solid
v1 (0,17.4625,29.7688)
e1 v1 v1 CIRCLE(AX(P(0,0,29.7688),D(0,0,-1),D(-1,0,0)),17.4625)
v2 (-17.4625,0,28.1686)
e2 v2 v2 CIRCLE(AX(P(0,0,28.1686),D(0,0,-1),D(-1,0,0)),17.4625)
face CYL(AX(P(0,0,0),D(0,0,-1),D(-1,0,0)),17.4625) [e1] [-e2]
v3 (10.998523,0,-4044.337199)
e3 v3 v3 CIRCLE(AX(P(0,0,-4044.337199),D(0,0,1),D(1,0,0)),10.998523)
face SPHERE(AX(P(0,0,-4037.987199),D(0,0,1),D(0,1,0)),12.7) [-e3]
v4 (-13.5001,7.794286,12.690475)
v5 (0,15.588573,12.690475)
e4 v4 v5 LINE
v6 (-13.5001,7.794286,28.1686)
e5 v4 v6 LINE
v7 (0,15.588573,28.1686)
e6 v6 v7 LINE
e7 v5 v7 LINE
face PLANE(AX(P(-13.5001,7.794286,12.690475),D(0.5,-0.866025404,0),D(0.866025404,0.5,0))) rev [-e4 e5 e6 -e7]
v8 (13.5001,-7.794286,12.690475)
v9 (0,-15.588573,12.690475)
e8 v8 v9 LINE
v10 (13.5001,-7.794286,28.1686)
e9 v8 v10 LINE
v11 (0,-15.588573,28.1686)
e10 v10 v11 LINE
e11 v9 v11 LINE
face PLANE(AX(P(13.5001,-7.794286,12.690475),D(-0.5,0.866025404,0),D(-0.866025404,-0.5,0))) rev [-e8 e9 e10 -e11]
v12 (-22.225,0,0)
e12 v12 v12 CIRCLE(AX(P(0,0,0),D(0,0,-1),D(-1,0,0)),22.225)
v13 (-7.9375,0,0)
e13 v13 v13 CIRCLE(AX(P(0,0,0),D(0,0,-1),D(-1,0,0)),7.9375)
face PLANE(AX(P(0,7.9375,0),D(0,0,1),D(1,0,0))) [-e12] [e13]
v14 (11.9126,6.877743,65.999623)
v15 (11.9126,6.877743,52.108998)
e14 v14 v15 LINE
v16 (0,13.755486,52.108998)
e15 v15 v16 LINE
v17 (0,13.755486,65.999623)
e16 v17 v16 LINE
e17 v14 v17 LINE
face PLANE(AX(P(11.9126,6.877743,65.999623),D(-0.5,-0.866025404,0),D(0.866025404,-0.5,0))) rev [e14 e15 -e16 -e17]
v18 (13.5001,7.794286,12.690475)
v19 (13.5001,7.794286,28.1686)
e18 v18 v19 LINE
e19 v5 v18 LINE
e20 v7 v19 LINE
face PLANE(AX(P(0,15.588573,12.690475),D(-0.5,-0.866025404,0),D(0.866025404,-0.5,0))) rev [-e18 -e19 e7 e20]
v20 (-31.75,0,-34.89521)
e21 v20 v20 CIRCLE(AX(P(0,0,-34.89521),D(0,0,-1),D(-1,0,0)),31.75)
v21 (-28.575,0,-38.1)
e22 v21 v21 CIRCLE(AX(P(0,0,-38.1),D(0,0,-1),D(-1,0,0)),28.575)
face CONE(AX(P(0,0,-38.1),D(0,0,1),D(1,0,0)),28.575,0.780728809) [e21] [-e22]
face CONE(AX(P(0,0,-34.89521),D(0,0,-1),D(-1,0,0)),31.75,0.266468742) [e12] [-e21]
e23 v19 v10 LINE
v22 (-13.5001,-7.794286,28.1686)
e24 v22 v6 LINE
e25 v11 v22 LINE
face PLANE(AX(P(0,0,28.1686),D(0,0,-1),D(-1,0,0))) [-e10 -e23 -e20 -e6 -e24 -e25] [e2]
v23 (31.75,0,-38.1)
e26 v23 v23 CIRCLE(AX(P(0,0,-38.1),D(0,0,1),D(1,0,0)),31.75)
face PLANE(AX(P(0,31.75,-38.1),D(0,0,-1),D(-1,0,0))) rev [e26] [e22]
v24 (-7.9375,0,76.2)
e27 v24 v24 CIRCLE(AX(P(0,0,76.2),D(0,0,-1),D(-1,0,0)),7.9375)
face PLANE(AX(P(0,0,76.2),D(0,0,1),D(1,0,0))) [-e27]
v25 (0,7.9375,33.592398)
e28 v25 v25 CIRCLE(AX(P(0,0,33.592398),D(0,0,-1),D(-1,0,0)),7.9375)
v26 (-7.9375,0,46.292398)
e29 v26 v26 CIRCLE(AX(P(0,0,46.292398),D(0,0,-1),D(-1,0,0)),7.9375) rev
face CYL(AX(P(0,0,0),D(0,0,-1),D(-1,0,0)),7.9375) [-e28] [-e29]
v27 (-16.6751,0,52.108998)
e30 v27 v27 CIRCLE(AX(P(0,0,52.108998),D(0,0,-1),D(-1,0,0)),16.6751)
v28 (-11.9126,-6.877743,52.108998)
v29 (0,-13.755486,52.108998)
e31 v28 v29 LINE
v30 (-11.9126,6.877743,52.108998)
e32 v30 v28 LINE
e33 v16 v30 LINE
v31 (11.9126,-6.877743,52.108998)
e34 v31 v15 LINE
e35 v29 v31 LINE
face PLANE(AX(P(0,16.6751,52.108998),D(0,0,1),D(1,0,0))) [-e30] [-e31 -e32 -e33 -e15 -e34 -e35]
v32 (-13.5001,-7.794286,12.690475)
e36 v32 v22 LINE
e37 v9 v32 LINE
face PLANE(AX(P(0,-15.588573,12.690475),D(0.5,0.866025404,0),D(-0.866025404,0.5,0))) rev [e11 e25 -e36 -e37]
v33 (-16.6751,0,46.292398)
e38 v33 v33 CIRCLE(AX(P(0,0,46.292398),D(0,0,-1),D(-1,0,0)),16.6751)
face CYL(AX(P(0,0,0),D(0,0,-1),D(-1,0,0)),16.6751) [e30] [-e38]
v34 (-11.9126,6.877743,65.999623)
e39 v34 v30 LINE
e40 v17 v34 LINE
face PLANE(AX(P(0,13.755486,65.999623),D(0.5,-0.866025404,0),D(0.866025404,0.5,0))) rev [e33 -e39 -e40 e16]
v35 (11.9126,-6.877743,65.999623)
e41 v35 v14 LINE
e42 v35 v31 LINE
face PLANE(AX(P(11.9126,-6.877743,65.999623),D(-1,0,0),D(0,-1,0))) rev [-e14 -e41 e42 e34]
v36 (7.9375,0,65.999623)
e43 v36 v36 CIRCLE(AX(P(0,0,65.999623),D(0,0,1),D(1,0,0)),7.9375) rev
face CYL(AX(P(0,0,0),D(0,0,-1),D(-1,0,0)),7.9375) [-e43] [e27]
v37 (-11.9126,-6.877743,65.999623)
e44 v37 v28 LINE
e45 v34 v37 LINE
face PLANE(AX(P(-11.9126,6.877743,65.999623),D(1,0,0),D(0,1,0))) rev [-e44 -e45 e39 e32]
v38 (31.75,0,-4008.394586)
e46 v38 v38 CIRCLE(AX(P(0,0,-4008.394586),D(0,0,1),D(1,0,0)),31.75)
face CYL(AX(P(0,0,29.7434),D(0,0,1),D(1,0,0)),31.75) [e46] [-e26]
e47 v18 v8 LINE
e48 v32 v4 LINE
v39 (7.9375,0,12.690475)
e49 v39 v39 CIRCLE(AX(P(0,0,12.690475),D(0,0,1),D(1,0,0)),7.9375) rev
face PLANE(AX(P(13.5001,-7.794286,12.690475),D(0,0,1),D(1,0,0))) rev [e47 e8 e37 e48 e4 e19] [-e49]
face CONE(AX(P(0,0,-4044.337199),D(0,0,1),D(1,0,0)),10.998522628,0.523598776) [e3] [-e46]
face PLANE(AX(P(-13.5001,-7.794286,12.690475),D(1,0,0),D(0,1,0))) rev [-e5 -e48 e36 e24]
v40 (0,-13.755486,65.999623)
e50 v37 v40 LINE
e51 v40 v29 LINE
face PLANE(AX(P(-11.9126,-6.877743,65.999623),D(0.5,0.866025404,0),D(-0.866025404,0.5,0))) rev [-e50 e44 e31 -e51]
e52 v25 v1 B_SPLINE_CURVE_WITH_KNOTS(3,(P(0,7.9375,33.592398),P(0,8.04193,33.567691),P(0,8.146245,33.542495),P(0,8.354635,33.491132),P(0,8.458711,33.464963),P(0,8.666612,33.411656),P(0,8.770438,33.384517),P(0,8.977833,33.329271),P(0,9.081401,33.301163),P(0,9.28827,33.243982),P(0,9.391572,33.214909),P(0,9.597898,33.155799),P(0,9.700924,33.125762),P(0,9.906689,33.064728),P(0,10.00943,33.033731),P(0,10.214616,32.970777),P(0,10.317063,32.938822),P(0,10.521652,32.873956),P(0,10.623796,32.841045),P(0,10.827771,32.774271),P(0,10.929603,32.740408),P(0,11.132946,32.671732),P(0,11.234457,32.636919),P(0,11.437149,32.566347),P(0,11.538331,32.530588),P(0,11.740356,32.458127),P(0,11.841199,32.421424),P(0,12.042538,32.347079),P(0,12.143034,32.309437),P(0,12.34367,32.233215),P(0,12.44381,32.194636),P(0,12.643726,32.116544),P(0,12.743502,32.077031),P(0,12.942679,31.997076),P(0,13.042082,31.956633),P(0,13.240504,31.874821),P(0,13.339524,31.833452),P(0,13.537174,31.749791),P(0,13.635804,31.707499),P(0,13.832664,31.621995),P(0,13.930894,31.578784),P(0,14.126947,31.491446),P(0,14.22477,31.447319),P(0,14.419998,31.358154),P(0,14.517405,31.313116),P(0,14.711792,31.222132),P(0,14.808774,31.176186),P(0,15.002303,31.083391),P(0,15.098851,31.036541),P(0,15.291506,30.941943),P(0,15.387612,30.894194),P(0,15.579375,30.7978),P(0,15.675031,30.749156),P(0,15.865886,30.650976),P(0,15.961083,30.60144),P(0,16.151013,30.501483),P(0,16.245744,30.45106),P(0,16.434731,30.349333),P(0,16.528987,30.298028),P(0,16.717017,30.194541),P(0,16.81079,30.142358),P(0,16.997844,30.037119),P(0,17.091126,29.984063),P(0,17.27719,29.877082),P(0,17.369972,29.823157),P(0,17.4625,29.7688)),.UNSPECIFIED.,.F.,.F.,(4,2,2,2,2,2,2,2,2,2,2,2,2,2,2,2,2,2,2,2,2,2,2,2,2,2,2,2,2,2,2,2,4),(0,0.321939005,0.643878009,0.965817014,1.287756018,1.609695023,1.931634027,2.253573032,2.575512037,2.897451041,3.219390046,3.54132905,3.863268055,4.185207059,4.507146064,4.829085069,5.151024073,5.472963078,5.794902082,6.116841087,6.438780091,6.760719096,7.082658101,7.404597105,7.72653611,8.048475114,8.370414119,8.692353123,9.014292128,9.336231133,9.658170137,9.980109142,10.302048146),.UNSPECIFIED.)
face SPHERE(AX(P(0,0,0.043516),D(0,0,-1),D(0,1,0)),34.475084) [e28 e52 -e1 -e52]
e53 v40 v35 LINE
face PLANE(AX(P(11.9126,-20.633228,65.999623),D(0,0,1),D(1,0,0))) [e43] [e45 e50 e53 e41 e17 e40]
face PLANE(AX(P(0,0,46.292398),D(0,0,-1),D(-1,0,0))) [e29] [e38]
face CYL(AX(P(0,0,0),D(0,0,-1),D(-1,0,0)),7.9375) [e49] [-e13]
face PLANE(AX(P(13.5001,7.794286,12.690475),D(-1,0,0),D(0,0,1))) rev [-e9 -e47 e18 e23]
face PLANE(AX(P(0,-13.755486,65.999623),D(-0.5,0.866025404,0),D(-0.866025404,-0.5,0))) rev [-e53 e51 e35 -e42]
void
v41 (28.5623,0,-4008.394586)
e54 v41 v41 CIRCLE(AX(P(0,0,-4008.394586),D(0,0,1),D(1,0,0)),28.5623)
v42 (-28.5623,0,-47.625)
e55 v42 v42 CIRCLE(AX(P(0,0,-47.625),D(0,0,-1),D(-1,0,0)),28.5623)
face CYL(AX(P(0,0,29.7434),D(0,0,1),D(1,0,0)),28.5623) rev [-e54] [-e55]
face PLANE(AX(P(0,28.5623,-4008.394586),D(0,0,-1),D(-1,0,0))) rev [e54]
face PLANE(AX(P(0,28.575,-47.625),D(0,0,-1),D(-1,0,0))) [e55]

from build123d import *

# Parameters (mm, degrees)
BOSS_REVOLVE3_START         = 12.690475
BOSS_REVOLVE3_OUTLINE_R     = 7.9375
BOSS_REVOLVE3_DEPTH         = 15.478125
BOSS_REVOLVE3_START_2       = 46.292398399
BOSS_REVOLVE3_2_OUTLINE_R   = 16.6751
BOSS_REVOLVE3_2_OUTLINE_R_2 = 7.9375
BOSS_REVOLVE3_2_DEPTH       = 5.8166
BOSS_EXTRUDE2_DEPTH         = 13.890625


# Read off the part's stored shape, not the designer's step: Boss-Revolve3
with BuildPart() as part:
    # Sketch1 → Base-Revolve (revolve)
    with BuildSketch(Plane(origin=(0, 0, 0), x_dir=(0, 0, -1), z_dir=(1, 0, 0)), mode=Mode.PRIVATE) as base_revolve_sk:
        Polygon((-76.2, 0), (-76.2, 7.9375), (0, 7.9375), (0, 22.225), (34.895210283, 31.75), (38.1, 28.575), (47.625, 28.575), (47.625, 0), align=None)
    revolve(base_revolve_sk.sketch.rotate(Axis((0, 0, 0), (0, 0, 1)), 90), axis=Axis((0, 0, 0), (0, 0, 1)))

    # Sketch3 → Boss-Revolve2 (revolve)
    with BuildSketch(Plane(origin=(0, 0, 0), x_dir=(0, 0, -1), z_dir=(1, 0, 0)), mode=Mode.PRIVATE) as boss_revolve2_sk:
        with BuildLine():
            Line((-28.1686, 0), (-28.1686, 17.4625))
            Line((-28.1686, 17.4625), (-29.7688, 17.4625))
            ThreePointArc((-29.7688, 17.4625), (-33.309963658, 9.048473715), (-34.5186, 0))
            Line((-34.5186, 0), (-28.1686, 0))
        make_face()
    revolve(boss_revolve2_sk.sketch.rotate(Axis((0, 0, 0), (0, 0, 1)), 90), axis=Axis((0, 0, 0), (0, 0, 1)))

    # Sketch2 → Boss-Revolve1 (revolve)
    with BuildSketch(Plane(origin=(0, 0, 0), x_dir=(0, 0, -1), z_dir=(1, 0, 0)), mode=Mode.PRIVATE) as boss_revolve1_sk:
        with BuildLine():
            Line((38.1, 31.75), (38.1, 28.5623))
            Line((38.1, 28.5623), (4008.394586153, 28.5623))
            Line((4008.394586153, 28.5623), (4008.394586153, 0))
            Line((4008.394586153, 0), (4050.687199293, 0))
            ThreePointArc((4050.687199293, 0), (4048.985721921, 6.35), (4044.337199293, 10.998522628))
            Line((4044.337199293, 10.998522628), (4008.394586153, 31.75))
            Line((4008.394586153, 31.75), (38.1, 31.75))
        make_face()
    revolve(boss_revolve1_sk.sketch.rotate(Axis((0, 0, 29.7434), (0, 0, -1)), 90), axis=Axis((0, 0, 29.7434), (0, 0, -1)))

    # Boss-Revolve3 outline → Boss-Revolve3 (add)
    with BuildSketch(Plane.XY.offset(BOSS_REVOLVE3_START)):
        Polygon((0, -15.588572738), (13.5001, -7.794286369), (13.5001, 7.794286369), (0, 15.588572738), (-13.5001, 7.794286369), (-13.5001, -7.794286369), align=None)
        Circle(BOSS_REVOLVE3_OUTLINE_R, mode=Mode.SUBTRACT)
    extrude(amount=BOSS_REVOLVE3_DEPTH)

    # Boss-Revolve3 2 outline → Boss-Revolve3 2 (add)
    with BuildSketch(Plane.XY.offset(BOSS_REVOLVE3_START_2)):
        Circle(BOSS_REVOLVE3_2_OUTLINE_R)
        Circle(BOSS_REVOLVE3_2_OUTLINE_R_2, mode=Mode.SUBTRACT)
    extrude(amount=BOSS_REVOLVE3_2_DEPTH)

    # Sketch6 → Boss-Extrude2 (add)
    with BuildSketch(Plane.XY.offset(52.108998399)):
        Polygon((0, -13.755485633), (11.9126, -6.877742817), (11.9126, 6.877742817), (0, 13.755485633), (-11.9126, 6.877742817), (-11.9126, -6.877742817), align=None)
    extrude(amount=BOSS_EXTRUDE2_DEPTH)


solid = part.part
